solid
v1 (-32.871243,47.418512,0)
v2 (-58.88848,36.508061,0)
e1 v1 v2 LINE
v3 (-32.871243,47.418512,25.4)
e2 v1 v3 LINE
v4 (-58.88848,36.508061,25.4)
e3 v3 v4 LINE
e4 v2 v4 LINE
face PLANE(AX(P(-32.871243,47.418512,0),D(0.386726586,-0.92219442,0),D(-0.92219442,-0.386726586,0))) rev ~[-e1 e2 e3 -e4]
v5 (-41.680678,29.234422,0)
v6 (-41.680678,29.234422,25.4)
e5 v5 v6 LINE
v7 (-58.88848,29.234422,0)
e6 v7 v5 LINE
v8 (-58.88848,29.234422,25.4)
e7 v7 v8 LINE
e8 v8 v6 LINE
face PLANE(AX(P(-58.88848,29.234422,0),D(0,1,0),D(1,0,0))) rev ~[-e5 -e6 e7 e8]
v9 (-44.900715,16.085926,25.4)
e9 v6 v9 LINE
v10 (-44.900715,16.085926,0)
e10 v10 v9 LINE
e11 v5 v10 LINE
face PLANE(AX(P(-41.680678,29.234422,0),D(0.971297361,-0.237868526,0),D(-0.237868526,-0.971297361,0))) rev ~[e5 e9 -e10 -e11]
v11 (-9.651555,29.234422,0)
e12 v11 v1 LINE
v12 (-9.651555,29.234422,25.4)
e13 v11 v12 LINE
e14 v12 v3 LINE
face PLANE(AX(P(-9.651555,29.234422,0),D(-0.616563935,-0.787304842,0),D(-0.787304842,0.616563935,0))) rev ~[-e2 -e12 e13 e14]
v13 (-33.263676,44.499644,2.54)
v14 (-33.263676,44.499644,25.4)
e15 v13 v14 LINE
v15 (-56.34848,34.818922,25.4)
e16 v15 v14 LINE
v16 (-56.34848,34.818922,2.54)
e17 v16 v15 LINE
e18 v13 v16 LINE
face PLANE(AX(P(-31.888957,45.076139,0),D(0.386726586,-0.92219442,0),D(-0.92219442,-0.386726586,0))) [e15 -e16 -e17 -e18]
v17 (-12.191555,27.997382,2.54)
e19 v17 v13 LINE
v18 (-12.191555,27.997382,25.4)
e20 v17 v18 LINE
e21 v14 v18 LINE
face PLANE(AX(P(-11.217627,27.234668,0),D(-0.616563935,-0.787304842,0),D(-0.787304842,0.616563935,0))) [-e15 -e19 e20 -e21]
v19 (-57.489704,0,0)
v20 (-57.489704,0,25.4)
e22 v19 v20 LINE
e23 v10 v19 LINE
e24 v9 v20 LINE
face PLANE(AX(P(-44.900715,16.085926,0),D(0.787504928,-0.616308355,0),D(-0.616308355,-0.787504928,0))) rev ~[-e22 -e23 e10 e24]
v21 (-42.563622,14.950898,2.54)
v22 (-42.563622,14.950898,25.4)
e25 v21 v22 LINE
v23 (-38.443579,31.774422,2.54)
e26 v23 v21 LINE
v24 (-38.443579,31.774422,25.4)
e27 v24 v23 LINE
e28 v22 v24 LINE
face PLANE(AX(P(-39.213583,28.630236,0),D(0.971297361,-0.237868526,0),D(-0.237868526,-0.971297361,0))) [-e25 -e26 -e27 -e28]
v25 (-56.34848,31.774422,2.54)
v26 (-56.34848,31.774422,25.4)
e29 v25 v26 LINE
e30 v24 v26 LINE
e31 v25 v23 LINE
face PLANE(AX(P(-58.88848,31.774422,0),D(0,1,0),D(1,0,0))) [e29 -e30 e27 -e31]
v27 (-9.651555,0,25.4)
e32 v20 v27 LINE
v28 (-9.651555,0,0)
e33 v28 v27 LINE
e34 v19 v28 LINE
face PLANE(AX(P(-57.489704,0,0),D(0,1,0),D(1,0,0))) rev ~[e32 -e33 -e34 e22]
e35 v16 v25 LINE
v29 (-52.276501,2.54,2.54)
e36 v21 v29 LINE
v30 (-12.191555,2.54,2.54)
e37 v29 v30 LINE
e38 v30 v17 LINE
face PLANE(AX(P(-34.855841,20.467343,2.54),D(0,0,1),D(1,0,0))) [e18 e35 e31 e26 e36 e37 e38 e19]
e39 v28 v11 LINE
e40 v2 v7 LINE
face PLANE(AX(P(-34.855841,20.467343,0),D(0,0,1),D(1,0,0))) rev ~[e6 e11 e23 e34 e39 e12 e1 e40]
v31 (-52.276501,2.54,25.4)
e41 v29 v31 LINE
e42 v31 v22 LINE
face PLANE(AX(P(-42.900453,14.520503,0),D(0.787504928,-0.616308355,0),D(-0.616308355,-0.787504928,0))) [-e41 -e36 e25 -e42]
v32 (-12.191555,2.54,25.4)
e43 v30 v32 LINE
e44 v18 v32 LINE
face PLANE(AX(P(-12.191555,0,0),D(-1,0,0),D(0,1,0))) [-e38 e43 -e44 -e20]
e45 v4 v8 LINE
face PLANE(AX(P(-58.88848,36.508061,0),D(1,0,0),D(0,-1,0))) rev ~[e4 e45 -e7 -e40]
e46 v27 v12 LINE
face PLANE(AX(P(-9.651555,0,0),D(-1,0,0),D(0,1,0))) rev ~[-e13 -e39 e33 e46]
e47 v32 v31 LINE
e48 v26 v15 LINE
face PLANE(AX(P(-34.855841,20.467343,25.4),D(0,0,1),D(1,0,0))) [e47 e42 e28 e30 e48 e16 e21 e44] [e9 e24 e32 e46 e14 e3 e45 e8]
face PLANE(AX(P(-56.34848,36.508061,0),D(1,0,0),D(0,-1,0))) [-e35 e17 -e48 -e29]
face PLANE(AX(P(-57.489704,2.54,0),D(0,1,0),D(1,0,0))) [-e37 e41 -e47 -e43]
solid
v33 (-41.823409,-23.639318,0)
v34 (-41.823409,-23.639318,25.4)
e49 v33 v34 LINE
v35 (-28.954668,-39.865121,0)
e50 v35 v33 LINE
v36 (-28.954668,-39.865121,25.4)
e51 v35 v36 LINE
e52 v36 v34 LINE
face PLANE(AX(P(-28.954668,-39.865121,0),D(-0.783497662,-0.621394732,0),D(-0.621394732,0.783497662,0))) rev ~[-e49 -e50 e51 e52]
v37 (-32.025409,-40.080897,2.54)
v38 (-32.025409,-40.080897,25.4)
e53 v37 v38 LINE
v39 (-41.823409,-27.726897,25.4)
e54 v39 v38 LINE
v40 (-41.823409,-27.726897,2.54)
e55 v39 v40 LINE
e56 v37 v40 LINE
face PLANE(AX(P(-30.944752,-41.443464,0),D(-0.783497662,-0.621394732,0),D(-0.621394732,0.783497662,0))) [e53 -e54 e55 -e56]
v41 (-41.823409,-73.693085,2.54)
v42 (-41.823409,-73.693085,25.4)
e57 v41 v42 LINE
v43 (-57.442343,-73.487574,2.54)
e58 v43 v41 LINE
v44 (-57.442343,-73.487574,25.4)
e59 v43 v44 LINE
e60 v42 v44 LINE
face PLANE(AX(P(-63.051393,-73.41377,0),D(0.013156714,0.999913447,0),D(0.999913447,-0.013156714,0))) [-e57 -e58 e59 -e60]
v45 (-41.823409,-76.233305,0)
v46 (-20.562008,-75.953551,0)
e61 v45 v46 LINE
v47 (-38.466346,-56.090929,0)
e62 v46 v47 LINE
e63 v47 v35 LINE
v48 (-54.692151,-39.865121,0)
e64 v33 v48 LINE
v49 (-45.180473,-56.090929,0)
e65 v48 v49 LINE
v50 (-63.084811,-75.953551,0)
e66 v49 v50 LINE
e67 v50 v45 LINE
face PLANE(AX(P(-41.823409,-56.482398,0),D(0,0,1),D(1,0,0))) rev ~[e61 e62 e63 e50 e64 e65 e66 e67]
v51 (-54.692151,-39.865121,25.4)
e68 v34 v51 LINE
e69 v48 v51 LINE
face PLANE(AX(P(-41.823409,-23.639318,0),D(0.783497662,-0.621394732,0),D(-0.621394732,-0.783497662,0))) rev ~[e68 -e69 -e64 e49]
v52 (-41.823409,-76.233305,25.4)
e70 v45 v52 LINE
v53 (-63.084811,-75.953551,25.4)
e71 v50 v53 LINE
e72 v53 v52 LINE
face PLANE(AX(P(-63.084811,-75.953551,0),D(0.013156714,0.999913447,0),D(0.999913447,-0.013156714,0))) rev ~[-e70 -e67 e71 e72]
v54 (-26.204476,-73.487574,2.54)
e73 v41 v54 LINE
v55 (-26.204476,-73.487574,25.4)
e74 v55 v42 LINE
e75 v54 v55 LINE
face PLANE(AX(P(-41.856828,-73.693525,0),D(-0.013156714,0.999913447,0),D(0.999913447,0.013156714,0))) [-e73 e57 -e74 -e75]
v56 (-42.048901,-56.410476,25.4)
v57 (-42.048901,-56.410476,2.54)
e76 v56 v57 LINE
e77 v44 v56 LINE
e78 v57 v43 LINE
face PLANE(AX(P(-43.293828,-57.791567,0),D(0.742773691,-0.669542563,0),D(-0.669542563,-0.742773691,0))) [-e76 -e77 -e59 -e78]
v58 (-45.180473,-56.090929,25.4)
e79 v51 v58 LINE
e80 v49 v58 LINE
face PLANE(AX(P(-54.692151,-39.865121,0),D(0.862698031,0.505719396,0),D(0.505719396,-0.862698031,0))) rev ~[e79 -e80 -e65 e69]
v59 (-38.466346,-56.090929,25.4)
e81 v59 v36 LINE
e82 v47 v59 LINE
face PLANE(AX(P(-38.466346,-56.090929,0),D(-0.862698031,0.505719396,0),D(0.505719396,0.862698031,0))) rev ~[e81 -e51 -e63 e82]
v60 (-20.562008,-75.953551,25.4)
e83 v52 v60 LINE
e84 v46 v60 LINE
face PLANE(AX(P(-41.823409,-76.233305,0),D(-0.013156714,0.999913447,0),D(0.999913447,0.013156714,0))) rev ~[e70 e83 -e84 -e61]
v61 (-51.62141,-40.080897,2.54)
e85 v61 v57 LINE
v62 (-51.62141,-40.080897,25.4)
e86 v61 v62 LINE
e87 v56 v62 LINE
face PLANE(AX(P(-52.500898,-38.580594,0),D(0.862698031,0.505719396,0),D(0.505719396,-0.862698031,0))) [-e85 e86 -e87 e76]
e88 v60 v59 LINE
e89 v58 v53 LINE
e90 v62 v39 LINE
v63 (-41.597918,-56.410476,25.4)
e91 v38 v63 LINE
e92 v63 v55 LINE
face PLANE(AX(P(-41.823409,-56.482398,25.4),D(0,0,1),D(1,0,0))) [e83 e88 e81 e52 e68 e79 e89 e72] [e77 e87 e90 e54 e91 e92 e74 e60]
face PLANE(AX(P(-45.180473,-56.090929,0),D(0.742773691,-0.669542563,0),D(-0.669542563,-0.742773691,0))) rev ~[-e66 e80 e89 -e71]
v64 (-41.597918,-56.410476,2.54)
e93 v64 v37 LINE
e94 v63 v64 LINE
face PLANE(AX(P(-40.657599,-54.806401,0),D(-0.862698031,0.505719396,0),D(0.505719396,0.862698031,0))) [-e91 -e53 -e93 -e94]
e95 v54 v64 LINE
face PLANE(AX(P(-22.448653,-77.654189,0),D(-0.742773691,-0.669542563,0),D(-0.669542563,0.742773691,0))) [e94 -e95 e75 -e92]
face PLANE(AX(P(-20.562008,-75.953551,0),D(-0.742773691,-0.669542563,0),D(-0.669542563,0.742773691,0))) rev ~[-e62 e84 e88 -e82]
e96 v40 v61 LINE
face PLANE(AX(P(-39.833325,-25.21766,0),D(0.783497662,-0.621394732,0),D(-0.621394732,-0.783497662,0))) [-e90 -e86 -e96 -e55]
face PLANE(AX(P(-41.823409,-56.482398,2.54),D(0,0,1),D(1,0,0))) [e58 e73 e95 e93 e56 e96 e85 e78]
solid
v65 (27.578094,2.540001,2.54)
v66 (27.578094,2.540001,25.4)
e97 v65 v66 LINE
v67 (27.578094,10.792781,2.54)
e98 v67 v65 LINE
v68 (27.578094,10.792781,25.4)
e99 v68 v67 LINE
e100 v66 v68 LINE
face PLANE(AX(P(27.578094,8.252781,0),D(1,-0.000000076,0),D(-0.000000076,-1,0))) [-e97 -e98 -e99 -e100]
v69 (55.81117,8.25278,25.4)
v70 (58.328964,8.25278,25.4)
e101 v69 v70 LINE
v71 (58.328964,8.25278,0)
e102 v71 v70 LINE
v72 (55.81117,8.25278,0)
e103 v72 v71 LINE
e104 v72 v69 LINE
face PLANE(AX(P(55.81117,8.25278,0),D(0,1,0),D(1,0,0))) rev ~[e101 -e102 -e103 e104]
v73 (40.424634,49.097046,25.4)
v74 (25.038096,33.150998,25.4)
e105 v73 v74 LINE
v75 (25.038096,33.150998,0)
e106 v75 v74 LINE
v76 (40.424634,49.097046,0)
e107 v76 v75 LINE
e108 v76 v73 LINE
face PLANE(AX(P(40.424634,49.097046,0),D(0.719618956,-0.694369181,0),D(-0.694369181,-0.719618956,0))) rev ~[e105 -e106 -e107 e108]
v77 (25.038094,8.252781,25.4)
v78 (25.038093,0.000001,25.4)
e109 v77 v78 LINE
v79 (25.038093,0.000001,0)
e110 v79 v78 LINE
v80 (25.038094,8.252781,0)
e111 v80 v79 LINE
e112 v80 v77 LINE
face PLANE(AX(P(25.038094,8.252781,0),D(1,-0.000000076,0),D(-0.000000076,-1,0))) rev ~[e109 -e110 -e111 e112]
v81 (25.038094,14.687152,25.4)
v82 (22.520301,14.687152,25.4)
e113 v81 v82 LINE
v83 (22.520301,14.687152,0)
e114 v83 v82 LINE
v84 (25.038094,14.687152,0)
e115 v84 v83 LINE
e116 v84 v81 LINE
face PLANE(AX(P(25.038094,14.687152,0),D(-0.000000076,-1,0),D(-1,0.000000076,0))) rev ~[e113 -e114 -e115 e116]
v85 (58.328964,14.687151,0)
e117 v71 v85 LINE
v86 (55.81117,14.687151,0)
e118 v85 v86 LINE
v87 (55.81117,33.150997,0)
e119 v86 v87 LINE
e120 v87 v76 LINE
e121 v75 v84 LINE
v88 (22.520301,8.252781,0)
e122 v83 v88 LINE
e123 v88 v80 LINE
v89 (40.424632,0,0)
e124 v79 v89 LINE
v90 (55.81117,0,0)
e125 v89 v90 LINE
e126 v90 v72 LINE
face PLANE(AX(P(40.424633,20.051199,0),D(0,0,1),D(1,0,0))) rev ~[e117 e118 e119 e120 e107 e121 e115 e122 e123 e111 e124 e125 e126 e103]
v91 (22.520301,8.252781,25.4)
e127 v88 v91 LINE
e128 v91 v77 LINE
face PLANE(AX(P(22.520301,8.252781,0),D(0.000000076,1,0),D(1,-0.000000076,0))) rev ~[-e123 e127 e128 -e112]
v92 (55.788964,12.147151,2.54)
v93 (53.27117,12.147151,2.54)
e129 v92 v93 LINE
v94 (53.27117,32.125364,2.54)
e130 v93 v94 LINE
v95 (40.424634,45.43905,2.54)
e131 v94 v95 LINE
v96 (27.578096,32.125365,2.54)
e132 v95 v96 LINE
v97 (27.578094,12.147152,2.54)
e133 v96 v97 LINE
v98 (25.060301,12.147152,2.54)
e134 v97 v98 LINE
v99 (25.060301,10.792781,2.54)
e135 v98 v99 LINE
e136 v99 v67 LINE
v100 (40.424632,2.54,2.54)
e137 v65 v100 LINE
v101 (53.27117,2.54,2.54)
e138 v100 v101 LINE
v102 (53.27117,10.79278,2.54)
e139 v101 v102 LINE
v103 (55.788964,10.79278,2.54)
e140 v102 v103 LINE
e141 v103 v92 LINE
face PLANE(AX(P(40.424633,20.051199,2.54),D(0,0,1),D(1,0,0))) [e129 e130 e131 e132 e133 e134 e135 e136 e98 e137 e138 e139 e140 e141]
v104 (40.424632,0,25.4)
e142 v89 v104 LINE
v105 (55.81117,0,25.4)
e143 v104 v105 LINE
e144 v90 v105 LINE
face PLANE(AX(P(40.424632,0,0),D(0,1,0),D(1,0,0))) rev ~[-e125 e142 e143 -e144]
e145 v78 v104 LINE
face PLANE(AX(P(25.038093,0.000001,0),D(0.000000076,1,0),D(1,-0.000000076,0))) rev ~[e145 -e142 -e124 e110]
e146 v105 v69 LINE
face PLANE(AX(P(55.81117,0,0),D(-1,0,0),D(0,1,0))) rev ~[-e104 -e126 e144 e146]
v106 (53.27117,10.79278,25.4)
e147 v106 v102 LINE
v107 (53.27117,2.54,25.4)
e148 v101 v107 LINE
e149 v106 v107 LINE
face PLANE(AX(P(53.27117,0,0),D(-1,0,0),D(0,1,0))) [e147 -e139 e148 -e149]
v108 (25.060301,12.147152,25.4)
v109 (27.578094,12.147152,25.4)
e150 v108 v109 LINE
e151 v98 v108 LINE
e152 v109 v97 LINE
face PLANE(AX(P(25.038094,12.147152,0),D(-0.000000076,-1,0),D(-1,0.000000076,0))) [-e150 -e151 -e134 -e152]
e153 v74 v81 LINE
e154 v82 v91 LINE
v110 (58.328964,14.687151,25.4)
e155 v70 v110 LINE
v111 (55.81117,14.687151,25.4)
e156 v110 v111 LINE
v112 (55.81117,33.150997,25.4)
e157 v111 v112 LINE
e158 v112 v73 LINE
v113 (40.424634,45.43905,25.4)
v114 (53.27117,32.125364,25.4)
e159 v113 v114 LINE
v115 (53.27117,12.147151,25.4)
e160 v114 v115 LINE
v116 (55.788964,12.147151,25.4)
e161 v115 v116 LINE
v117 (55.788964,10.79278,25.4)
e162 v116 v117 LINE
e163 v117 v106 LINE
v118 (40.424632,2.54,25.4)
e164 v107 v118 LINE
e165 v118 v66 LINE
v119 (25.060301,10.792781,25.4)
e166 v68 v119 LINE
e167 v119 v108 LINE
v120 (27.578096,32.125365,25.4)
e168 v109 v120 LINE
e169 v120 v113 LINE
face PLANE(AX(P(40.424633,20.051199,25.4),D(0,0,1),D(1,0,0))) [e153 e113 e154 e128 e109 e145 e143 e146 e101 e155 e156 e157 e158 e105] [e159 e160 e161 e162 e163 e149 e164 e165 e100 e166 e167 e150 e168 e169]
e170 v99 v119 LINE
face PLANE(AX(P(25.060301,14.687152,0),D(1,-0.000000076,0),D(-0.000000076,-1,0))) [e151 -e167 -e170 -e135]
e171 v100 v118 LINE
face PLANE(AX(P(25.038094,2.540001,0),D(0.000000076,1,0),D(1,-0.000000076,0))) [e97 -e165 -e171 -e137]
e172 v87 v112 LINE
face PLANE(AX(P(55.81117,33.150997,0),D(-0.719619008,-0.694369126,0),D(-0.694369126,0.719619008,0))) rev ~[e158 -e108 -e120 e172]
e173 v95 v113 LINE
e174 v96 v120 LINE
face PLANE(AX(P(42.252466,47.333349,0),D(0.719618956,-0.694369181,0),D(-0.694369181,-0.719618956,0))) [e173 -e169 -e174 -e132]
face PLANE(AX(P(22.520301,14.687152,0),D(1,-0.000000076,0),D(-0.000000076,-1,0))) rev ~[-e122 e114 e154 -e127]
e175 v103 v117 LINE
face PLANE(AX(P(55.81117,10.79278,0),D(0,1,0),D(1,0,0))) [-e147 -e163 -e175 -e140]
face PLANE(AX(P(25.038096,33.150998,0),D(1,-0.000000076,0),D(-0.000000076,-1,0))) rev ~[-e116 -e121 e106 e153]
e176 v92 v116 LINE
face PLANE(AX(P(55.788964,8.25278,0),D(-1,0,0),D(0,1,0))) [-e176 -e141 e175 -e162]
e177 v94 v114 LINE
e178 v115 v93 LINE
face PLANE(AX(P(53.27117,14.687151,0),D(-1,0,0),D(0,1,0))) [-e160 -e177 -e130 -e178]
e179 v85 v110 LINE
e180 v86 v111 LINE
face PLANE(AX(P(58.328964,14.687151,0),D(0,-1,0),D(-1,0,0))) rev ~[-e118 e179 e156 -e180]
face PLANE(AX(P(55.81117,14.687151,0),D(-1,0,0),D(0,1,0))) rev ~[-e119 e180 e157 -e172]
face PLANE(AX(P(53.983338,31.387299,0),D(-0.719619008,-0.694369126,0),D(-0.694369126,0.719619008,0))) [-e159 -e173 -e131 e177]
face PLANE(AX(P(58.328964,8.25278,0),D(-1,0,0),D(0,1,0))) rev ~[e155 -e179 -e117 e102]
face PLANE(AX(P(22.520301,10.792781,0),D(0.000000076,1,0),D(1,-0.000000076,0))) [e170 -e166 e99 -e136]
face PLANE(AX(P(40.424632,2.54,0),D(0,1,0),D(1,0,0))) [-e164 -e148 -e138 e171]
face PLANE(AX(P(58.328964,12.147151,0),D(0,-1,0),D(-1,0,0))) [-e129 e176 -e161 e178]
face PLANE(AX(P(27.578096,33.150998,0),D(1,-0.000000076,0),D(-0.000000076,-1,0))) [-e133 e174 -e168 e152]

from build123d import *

# Parameters (mm, degrees)
F1_DEPTH = 25.4
F2_T     = -2.54
F4_DEPTH = 25.4
F5_T     = -2.54
F7_DEPTH = 25.4
F8_T     = -2.54


with BuildPart() as f1:
    # F0 (on Top) → F1 (new body)
    with BuildSketch(Plane.XY):
        Polygon((-44.9007153511, 16.0859264433), (-57.4897043407, 0), (-9.6515547484, 0), (-9.6515547484, 29.2344223708), (-32.8712426126, 47.418512404), (-58.8884800673, 36.5080609918), (-58.8884800673, 29.2344223708), (-41.6806784491, 29.2344223708), align=None)
    extrude(amount=F1_DEPTH)

    # F2
    f2_openings = [f1.faces().sort_by_distance(p)[0] for p in [
        (-31.482072, 20.842376, 25.4),
    ]]
    offset(amount=F2_T, openings=f2_openings, kind=Kind.INTERSECTION)


with BuildPart() as f4:
    # F3 (on Top) → F4 (new body)
    with BuildSketch(Plane.XY):
        Polygon((40.4246318837, 0), (55.8111704638, 0), (55.8111704638, 8.2527799532), (58.3289637913, 8.2527799532), (58.3289637913, 14.6871507168), (55.8111704638, 14.6871507168), (55.8111704638, 33.1509970129), (40.4246337463, 49.0970462561), (25.0380958438, 33.1509981803), (25.0380944429, 14.6871518843), (22.5203011153, 14.6871520753), (22.5203006271, 8.2527813117), (25.0380939547, 8.2527811207), (25.0380933285, 1.1675e-06), align=None)
    extrude(amount=F4_DEPTH)

    # F5
    f5_openings = [f4.faces().sort_by_distance(p)[0] for p in [
        (40.424633, 20.586239, 25.4),
    ]]
    offset(amount=F5_T, openings=f5_openings, kind=Kind.INTERSECTION)


with BuildPart() as f7:
    # F6 (on Top) → F7 (new body)
    with BuildSketch(Plane.XY):
        Polygon((-41.8234094977, -23.6393176019), (-54.6921510249, -39.8651212454), (-45.1804734766, -56.0909286141), (-63.0848109722, -75.9535506368), (-41.8234094977, -76.233305037), (-20.5620080233, -75.9535506368), (-38.4663455188, -56.0909286141), (-28.9546679705, -39.8651212454), align=None)
    extrude(amount=F7_DEPTH)

    # F8
    f8_openings = [f7.faces().sort_by_distance(p)[0] for p in [
        (-41.823409, -55.141172, 25.4),
    ]]
    offset(amount=F8_T, openings=f8_openings, kind=Kind.INTERSECTION)


solid = Compound([f1.part, f4.part, f7.part])
